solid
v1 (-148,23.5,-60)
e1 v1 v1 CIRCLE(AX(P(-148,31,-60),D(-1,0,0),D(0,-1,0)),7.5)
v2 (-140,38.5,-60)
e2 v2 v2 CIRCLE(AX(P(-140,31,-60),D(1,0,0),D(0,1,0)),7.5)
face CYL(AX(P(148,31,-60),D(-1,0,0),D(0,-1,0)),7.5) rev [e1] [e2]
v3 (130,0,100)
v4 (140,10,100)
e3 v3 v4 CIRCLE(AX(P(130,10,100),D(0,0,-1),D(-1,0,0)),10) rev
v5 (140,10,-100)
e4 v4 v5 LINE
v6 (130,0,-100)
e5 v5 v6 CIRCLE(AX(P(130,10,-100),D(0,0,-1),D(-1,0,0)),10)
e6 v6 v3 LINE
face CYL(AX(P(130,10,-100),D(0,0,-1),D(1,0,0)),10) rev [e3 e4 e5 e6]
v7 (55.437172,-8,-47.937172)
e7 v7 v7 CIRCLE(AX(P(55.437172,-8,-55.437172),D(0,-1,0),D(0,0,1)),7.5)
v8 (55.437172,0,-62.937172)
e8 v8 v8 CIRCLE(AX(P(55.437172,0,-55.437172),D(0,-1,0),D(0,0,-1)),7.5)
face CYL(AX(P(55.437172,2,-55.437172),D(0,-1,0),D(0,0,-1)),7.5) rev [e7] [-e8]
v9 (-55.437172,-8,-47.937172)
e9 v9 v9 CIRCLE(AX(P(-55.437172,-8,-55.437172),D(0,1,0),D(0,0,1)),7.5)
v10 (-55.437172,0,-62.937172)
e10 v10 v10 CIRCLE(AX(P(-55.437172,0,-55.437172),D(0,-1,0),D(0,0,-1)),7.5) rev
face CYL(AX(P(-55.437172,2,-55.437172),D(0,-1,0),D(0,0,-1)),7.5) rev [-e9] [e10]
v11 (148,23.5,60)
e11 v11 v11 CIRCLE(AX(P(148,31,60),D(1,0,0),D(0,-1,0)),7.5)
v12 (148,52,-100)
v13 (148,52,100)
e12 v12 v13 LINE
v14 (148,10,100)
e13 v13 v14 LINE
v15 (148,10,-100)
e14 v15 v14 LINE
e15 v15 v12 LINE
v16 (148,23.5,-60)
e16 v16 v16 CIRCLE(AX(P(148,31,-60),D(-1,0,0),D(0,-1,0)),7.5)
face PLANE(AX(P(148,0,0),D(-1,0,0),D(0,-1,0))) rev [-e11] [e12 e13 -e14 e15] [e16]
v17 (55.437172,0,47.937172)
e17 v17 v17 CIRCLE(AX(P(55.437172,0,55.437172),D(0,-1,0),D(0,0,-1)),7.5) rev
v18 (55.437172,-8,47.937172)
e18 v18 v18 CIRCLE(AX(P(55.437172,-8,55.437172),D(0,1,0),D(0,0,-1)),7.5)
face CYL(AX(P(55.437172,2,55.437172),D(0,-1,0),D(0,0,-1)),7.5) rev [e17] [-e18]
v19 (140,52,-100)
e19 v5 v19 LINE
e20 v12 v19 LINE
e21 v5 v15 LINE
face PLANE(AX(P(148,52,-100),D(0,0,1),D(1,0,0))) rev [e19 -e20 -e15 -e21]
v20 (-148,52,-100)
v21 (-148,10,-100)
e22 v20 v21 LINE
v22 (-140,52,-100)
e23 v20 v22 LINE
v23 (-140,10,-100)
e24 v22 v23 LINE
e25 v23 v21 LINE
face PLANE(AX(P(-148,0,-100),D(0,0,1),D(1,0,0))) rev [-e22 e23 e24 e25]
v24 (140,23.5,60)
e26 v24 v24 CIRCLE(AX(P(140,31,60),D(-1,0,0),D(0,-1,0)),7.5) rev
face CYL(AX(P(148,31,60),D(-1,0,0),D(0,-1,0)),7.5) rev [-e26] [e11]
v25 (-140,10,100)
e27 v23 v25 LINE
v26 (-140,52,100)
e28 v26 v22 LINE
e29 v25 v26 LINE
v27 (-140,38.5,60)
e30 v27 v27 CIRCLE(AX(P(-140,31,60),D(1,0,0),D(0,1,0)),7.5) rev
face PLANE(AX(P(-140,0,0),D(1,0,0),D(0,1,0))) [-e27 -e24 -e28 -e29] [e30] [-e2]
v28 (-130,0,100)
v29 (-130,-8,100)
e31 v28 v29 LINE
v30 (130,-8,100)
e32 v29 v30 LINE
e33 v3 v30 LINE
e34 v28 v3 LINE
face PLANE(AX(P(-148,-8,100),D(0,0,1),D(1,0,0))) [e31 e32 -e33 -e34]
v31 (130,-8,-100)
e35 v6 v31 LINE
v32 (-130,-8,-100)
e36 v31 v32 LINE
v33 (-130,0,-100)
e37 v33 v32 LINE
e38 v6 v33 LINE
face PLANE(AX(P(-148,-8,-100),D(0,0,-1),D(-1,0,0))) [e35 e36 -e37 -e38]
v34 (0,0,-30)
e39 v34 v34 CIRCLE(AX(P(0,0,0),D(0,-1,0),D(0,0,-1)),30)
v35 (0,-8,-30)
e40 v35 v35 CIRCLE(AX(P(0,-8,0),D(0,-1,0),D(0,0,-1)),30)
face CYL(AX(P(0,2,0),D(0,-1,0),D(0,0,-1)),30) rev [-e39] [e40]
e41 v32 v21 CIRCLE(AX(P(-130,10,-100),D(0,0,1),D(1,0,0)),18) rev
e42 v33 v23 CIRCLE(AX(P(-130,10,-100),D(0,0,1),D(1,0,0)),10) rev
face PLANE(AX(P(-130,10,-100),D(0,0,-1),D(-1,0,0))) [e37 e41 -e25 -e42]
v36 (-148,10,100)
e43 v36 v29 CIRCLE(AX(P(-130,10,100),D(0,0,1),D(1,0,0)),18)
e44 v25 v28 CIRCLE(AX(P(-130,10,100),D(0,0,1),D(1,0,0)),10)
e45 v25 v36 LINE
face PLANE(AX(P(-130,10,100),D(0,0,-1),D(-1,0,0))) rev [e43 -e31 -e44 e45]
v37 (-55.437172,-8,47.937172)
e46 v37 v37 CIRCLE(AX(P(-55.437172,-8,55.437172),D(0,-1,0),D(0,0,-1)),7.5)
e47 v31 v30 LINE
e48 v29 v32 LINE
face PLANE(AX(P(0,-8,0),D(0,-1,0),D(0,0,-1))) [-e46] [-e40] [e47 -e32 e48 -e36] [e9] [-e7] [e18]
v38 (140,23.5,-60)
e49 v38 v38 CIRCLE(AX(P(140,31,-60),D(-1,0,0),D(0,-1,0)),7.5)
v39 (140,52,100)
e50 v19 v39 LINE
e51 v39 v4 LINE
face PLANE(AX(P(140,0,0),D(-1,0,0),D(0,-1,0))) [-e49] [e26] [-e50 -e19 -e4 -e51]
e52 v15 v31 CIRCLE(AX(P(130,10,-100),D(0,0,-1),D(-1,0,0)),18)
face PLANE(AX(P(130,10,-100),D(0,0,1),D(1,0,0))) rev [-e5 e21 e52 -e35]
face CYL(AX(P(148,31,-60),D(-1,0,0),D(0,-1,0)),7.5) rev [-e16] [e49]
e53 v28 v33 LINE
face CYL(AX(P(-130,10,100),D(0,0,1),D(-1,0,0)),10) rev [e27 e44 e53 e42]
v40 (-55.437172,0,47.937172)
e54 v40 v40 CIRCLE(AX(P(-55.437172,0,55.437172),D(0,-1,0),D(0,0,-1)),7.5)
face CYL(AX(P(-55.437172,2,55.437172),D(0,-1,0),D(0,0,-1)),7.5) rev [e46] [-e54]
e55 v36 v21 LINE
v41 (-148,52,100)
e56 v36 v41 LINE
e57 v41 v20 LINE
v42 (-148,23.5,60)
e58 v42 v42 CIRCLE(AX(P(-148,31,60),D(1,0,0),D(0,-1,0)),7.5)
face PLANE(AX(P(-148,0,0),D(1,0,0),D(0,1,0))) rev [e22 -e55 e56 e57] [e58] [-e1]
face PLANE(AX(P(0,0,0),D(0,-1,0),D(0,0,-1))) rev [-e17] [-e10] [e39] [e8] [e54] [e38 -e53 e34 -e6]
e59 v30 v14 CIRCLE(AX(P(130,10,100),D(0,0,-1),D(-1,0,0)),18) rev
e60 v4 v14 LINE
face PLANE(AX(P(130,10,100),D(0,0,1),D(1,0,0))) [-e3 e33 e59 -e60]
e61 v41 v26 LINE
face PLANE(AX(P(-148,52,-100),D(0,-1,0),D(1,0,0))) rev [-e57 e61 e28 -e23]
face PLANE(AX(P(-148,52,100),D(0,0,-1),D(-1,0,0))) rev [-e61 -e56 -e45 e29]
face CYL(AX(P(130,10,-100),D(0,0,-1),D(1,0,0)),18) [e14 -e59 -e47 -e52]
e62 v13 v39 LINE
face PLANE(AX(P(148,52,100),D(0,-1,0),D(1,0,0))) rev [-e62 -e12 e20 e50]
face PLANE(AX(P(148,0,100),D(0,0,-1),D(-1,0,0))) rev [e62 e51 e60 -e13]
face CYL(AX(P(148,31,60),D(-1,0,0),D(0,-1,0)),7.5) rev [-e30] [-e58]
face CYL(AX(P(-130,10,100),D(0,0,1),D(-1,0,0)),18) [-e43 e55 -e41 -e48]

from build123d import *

# Parameters (mm, degrees)
SKETCH1_W                      = 296
SKETCH1_H                      = 200
BASE_FLANGE1_DEPTH             = 8
EDGE_FLANGE1_STRIP_W           = 52
EDGE_FLANGE1_STRIP_H           = 8
EDGE_FLANGE1_STRIP_CUT_DEPTH   = 200
EDGE_FLANGE1_STRIP_2_W         = 52
EDGE_FLANGE1_STRIP_2_H         = 8
EDGE_FLANGE1_STRIP_CUT_2_DEPTH = 200
EDGE_FLANGE1_DEPTH             = 200
EDGE_FLANGE1_BEND_DEPTH        = 200
SKETCH12_R                     = 30
CUT_EXTRUDE1_DEPTH             = 10
SKETCH13_R                     = 7.5
CUT_EXTRUDE2_DEPTH             = 10
SKETCH15_R                     = 7.5
CUT_EXTRUDE3_DEPTH             = 317.733326317
MIRROR5_COPY_1_SKETCH_R        = 7.5
MIRROR5_COPY_1_DEPTH           = 10


# Sheet-metal steps are written as plain solids
with BuildPart() as part:
    # Sketch1 → Base-Flange1 (new body)
    with BuildSketch(Plane(origin=(0, 0, 0), x_dir=(1, 0, 0), z_dir=(0, 1, 0))):
        Rectangle(SKETCH1_W, SKETCH1_H)
    extrude(amount=-BASE_FLANGE1_DEPTH)

    # Edge-Flange1 strip (across the edge) → Edge-Flange1 strip cut (cut)
    with BuildSketch(Plane(origin=(-148, 0, -100), x_dir=(1, 0, 0), z_dir=(0, 0, 1))):
        with Locations((-8, -4)):
            Rectangle(EDGE_FLANGE1_STRIP_W, EDGE_FLANGE1_STRIP_H)
    extrude(amount=EDGE_FLANGE1_STRIP_CUT_DEPTH, mode=Mode.SUBTRACT)

    # Edge-Flange1 strip 2 (across the edge) → Edge-Flange1 strip cut 2 (cut)
    with BuildSketch(Plane(origin=(148, 0, 100), x_dir=(-1, 0, 0), z_dir=(0, 0, -1))):
        with Locations((-8, -4)):
            Rectangle(EDGE_FLANGE1_STRIP_2_W, EDGE_FLANGE1_STRIP_2_H)
    extrude(amount=EDGE_FLANGE1_STRIP_CUT_2_DEPTH, mode=Mode.SUBTRACT)

    # Edge-Flange1 section (across the edge) → Edge-Flange1 (add)
    with BuildSketch(Plane(origin=(-148, 0, -100), x_dir=(1, 0, 0), z_dir=(0, 0, 1))):
        with BuildLine():
            Line((0, 10), (0, 52))
            Line((0, 52), (8, 52))
            Line((8, 52), (8, 10))
            ThreePointArc((8, 10), (10.928932188, 2.928932188), (18, 0))
            Line((18, 0), (18, -8))
            ThreePointArc((18, -8), (5.272077939, -2.727922061), (0, 10))
        make_face()
    extrude(amount=EDGE_FLANGE1_DEPTH)

    # Edge-Flange1 section 2 (across the edge) → Edge-Flange1 bend (add)
    with BuildSketch(Plane(origin=(148, 0, 100), x_dir=(-1, 0, 0), z_dir=(0, 0, -1))):
        with BuildLine():
            Line((0, 10), (0, 52))
            Line((0, 52), (8, 52))
            Line((8, 52), (8, 10))
            ThreePointArc((8, 10), (10.928932188, 2.928932188), (18, 0))
            Line((18, 0), (18, -8))
            ThreePointArc((18, -8), (5.272077939, -2.727922061), (0, 10))
        make_face()
    extrude(amount=EDGE_FLANGE1_BEND_DEPTH)

    # Sketch12 → Cut-Extrude1 (cut)
    with BuildSketch(Plane(origin=(0, -8, 0), x_dir=(-1, 0, 0), z_dir=(0, -1, 0))):
        with Locations(Location((0, 0, 0), (0, 0, 90))):
            Circle(SKETCH12_R)
    extrude(amount=-CUT_EXTRUDE1_DEPTH, mode=Mode.SUBTRACT)

    # Sketch13 → Cut-Extrude2 (cut)
    with BuildSketch(Plane(origin=(0, -8, 0), x_dir=(-1, 0, 0), z_dir=(0, -1, 0))):
        with Locations(Location((55.437171645, -55.437171645, 0), (0, 0, 90))):
            Circle(SKETCH13_R)
    cut_extrude2 = extrude(amount=-CUT_EXTRUDE2_DEPTH, mode=Mode.SUBTRACT)

    # Mirror4: Cut-Extrude2 across plane
    add(cut_extrude2.mirror(Plane(origin=(0, 0, 0), x_dir=(0, 0, 1), z_dir=(1, 0, 0))), mode=Mode.SUBTRACT)

    # Sketch15 → Cut-Extrude3 (cut, through all)
    with BuildSketch(Plane.ZY.offset(148)):
        with Locations(Location((-60, 31, 0), (0, 0, 270))):
            Circle(SKETCH15_R)
    cut_extrude3 = extrude(amount=-CUT_EXTRUDE3_DEPTH, mode=Mode.SUBTRACT)

    # Mirror5: Cut-Extrude2, Cut-Extrude3 across plane
    add(cut_extrude2.mirror(Plane.XY), mode=Mode.SUBTRACT)
    add(cut_extrude3.mirror(Plane.XY), mode=Mode.SUBTRACT)

    # Mirror5 copy 1 sketch → Mirror5 copy 1 (cut)
    with BuildSketch(Plane.XZ.offset(8)):
        with Locations(Location((55.437171645, -55.437171645, 0), (0, 0, 90))):
            Circle(MIRROR5_COPY_1_SKETCH_R)
    extrude(amount=-MIRROR5_COPY_1_DEPTH, mode=Mode.SUBTRACT)


solid = part.part
